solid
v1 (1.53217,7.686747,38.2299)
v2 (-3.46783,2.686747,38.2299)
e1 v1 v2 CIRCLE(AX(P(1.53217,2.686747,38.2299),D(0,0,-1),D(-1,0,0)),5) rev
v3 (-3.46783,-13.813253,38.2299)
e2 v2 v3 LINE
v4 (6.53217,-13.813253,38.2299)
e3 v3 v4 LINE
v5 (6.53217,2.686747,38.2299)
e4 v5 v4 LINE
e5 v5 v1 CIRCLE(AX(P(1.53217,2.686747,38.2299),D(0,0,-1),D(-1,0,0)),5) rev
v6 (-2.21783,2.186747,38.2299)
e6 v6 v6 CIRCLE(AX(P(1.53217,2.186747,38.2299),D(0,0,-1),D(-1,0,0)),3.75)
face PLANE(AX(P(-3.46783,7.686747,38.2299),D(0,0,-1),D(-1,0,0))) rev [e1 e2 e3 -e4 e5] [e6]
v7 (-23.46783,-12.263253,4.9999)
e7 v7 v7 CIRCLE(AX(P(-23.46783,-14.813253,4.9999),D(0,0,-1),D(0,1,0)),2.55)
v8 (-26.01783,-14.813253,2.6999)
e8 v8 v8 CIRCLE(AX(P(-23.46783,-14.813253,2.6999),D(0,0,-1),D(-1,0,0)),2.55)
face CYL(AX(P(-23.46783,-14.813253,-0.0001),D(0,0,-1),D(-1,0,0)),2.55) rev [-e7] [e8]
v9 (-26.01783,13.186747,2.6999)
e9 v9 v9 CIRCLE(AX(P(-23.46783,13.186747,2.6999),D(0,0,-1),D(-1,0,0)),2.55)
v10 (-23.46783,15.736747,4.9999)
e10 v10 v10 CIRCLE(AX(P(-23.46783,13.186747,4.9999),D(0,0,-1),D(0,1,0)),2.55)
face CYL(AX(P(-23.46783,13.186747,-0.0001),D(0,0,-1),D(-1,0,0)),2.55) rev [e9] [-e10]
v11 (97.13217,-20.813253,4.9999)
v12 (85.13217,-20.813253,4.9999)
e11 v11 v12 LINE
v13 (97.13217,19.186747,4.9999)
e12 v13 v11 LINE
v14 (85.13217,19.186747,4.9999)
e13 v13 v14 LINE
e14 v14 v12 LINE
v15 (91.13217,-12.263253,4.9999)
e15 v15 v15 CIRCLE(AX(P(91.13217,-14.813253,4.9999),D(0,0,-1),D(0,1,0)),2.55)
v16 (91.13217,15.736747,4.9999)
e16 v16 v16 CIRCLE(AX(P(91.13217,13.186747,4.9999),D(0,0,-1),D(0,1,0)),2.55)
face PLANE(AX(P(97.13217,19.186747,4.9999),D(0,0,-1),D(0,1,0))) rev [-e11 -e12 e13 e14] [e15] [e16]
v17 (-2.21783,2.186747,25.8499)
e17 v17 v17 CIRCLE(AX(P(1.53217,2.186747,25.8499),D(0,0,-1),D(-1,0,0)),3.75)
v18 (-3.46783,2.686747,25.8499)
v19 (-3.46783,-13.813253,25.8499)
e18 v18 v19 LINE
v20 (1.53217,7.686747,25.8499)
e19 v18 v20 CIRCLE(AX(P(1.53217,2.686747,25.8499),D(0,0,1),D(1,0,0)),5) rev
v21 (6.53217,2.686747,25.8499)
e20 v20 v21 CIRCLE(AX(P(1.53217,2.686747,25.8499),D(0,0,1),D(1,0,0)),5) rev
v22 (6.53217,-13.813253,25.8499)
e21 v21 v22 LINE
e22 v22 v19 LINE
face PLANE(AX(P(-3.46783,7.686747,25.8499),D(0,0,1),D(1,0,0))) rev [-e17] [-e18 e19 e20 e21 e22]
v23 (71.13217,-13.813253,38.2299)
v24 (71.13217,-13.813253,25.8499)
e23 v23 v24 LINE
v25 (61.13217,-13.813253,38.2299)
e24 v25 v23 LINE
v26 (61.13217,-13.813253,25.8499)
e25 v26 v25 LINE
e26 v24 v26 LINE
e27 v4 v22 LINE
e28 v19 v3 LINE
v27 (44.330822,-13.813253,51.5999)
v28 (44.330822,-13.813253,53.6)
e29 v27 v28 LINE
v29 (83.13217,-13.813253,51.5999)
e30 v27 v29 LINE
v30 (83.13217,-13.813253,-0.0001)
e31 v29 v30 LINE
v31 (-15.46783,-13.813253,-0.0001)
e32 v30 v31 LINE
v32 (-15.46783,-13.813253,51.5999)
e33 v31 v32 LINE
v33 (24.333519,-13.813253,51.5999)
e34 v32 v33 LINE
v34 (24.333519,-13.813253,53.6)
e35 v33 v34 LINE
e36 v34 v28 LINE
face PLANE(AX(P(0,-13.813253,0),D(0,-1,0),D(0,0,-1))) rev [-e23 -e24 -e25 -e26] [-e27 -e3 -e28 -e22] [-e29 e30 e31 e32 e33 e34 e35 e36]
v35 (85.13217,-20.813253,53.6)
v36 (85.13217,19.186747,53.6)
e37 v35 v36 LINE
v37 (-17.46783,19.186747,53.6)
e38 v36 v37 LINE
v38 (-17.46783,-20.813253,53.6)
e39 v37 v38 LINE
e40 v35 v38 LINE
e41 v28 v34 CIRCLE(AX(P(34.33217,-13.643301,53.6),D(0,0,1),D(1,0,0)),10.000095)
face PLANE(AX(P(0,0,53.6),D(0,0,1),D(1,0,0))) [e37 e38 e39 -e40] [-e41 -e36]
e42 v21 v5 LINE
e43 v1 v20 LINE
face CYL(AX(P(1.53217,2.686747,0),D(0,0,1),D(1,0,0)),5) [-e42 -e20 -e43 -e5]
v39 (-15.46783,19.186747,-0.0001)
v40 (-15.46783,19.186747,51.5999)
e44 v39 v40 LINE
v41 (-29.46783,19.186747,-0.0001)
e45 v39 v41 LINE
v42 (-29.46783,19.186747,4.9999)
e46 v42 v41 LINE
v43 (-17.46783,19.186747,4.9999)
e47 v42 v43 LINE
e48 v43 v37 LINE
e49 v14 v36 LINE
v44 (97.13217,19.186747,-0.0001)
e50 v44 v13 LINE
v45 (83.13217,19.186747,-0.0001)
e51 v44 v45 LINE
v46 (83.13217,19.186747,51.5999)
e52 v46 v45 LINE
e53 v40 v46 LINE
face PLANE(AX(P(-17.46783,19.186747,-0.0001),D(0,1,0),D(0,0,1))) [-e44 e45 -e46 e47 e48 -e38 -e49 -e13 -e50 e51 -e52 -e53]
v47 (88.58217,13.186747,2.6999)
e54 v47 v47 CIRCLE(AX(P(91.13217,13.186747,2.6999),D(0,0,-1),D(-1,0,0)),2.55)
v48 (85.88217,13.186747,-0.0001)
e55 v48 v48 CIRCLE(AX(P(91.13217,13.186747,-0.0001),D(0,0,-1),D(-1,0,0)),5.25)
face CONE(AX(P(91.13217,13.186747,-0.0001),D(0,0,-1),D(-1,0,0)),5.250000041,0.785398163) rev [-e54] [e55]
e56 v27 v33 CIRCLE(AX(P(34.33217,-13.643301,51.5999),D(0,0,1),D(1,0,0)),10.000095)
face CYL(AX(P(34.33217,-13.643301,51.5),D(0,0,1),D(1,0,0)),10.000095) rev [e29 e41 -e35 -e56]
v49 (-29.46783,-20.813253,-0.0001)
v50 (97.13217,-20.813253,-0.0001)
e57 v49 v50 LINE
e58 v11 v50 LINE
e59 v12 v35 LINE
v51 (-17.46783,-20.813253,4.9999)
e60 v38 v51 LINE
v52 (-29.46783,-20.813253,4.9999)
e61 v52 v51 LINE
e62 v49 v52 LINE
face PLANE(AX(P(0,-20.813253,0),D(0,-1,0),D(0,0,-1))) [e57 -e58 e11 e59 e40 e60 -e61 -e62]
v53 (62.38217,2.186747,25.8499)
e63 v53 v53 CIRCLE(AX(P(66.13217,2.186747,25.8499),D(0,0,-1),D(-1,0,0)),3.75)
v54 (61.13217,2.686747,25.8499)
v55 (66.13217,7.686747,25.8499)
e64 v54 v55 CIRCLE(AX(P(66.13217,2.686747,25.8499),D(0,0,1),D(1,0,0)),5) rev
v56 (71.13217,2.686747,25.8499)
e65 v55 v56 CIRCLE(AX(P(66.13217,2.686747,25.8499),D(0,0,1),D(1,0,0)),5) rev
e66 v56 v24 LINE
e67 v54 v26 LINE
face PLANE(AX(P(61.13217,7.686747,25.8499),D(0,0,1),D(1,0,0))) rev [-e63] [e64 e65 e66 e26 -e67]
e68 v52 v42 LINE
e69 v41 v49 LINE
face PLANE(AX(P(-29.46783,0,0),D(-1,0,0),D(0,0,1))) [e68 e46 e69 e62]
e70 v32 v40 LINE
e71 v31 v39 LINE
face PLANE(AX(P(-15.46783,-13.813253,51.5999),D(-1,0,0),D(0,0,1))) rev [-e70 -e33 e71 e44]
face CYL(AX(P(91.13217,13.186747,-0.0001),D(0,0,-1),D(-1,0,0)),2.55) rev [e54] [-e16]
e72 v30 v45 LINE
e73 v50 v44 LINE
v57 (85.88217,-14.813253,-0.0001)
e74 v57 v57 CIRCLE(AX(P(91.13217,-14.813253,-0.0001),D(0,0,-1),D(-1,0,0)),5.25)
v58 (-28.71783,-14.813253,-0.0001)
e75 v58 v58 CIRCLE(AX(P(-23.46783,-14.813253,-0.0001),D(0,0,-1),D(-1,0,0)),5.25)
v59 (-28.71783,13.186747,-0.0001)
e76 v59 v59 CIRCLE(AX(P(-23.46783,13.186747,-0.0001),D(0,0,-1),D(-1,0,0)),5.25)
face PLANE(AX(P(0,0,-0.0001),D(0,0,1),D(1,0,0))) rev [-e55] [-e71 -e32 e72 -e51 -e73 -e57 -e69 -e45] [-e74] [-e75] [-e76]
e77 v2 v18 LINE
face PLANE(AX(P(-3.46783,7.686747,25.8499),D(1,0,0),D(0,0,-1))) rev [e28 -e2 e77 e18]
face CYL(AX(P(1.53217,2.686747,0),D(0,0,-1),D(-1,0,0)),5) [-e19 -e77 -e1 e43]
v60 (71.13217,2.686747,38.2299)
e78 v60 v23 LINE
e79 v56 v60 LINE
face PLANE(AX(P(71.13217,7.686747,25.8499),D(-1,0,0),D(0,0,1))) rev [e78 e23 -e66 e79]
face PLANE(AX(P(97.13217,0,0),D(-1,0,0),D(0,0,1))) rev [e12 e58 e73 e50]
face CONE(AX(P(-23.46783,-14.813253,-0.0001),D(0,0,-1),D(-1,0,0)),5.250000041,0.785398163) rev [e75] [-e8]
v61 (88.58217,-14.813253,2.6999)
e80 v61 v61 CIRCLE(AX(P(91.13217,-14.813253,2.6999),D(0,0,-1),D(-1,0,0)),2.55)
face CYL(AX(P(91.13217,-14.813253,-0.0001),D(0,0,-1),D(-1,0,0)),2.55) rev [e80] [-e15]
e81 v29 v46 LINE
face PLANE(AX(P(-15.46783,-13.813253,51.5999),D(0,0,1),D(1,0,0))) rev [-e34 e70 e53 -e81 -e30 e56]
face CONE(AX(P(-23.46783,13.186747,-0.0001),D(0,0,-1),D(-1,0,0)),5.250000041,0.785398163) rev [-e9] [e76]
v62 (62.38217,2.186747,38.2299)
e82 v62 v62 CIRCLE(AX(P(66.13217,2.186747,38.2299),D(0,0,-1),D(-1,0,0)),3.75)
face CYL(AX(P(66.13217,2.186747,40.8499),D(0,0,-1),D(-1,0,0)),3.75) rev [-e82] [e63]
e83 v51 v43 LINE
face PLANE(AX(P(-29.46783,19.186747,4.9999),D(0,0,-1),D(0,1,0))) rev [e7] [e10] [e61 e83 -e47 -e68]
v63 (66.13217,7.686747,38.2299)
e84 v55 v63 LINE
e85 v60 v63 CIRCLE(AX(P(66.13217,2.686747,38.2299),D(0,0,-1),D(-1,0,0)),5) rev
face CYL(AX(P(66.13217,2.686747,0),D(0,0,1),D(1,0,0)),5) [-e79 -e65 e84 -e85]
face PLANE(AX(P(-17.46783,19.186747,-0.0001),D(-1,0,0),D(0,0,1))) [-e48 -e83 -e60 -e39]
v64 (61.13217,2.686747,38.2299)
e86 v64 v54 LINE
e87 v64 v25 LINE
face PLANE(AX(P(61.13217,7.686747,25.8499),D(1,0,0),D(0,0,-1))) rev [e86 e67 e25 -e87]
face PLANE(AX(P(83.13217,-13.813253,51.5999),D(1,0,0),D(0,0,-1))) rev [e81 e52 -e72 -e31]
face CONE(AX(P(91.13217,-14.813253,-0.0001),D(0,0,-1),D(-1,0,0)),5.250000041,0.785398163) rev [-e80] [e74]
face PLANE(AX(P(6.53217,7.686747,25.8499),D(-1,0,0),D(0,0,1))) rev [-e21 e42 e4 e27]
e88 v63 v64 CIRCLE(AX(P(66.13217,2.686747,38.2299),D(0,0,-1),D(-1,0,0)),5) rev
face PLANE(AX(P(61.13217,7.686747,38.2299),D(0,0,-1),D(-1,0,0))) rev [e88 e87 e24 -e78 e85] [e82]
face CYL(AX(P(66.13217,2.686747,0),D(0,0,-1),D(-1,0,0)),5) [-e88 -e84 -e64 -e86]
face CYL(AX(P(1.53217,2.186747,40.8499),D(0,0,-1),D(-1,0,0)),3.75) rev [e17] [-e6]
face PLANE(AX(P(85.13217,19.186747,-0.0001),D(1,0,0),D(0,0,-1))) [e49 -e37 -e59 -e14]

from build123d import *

# Parameters (mm, degrees)
BOSS_EXTRU_1_DEPTH                                = 53.6
BOSS_EXTRU_1_DEPTH_BACK                           = 0.0001
ESQUISSE1_W                                       = 102.6
ESQUISSE1_H                                       = 35
ESQUISSE4_W                                       = 98.6
ESQUISSE4_H                                       = 51.6
ENL_V_MAT_EXTRU_2_DEPTH                           = 33
ESQUISSE9_W                                       = 10
ESQUISSE9_H                                       = 12.38
BOSS_EXTRU_3_DEPTH                                = 21.5
CONG_1_R                                          = 5
ESQUISSE10_R                                      = 3.75
ENL_V_MAT_EXTRU_4_DEPTH                           = 15
ENL_V_MAT_EXTRU_5_DEPTH                           = 2.1
ESQUISSE19_W                                      = 102.6
ESQUISSE19_H                                      = 53.6001
BOSS_EXTRU_4_DEPTH                                = 5
ESQUISSE21_W                                      = 5
ESQUISSE21_H                                      = 40
BOSS_EXTRU_5_DEPTH                                = 12
ESQUISSE22_W                                      = 5
ESQUISSE22_H                                      = 40
BOSS_EXTRU_6_DEPTH                                = 12
FRAISAGE_POUR_VIS_T_TE_FRAIS_E_BOMB_E_D           = 5.09999996
FRAISAGE_POUR_VIS_T_TE_FRAIS_E_BOMB_E_CSINK_D     = 10.500000082
FRAISAGE_POUR_VIS_T_TE_FRAIS_E_BOMB_E_CSINK_ANGLE = 90


with BuildPart() as part:
    # Esquisse1 → Boss.-Extru.1 (new, two sides: drawn at the far end of the back side and taken through both)
    with BuildSketch(Plane.XY.offset(-BOSS_EXTRU_1_DEPTH_BACK)):
        with Locations((33.832170394, 1.686746988)):
            Rectangle(ESQUISSE1_W, ESQUISSE1_H)
    extrude(amount=BOSS_EXTRU_1_DEPTH + BOSS_EXTRU_1_DEPTH_BACK)

    # Esquisse4 → Enlèv. mat.-Extru.2 (cut)
    with BuildSketch(Plane(origin=(0, 19.186746988, 0), x_dir=(1, 0, 0), z_dir=(0, 1, 0))):
        with Locations((33.832170394, -25.7999)):
            Rectangle(ESQUISSE4_W, ESQUISSE4_H)
    extrude(amount=-ENL_V_MAT_EXTRU_2_DEPTH, mode=Mode.SUBTRACT)

    # Esquisse9 → Boss.-Extru.3 (add)
    with BuildSketch(Plane(origin=(0, -13.813253012, 0), x_dir=(1, 0, 0), z_dir=(0, 1, 0))):
        with Locations((1.532170394, -32.0399)):
            Rectangle(ESQUISSE9_W, ESQUISSE9_H)
        with Locations((66.132170394, -32.0399)):
            Rectangle(ESQUISSE9_W, ESQUISSE9_H)
    extrude(amount=BOSS_EXTRU_3_DEPTH)

    # Congé1
    cong_1_edges = [part.edges().sort_by_distance(p)[0] for p in [
        (-3.467829606, 7.686746988, 32.0399),
        (6.532170394, 7.686746988, 32.0399),
        (71.132170394, 7.686746988, 32.0399),
        (61.132170394, 7.686746988, 32.0399),
    ]]
    fillet(cong_1_edges, radius=CONG_1_R - 0.0001)  # a hair under: the kernel refuses the full size

    # Esquisse10 → Enlèv. mat.-Extru.4 (cut)
    with BuildSketch(Plane(origin=(0, 0, 25.8499), x_dir=(-1, 0, 0), z_dir=(0, 0, -1))):
        with Locations((-66.132170394, 2.186746988)):
            Circle(ESQUISSE10_R)
        with Locations((-1.532170394, 2.186746988)):
            Circle(ESQUISSE10_R)
    extrude(amount=-ENL_V_MAT_EXTRU_4_DEPTH, mode=Mode.SUBTRACT)

    # Esquisse18 → Enlèv. mat.-Extru.5 (cut)
    with BuildSketch(Plane.XY.offset(53.6)):
        with BuildLine():
            Line((24.333519225, -13.813253012), (44.330821563, -13.813253012))
            ThreePointArc((44.330821563, -13.813253012), (34.332170394, -3.643205178), (24.333519225, -13.813253012))
        make_face()
    extrude(amount=-ENL_V_MAT_EXTRU_5_DEPTH, mode=Mode.SUBTRACT)

    # Esquisse19 → Boss.-Extru.4 (add)
    with BuildSketch(Plane.XZ.offset(15.813253012)):
        with Locations((33.832170394, 26.79995)):
            Rectangle(ESQUISSE19_W, ESQUISSE19_H)
    extrude(amount=BOSS_EXTRU_4_DEPTH)

    # Esquisse21 → Boss.-Extru.5 (add)
    with BuildSketch(Plane.ZY.offset(17.467829606)):
        with Locations((2.4999, -0.813253012)):
            Rectangle(ESQUISSE21_W, ESQUISSE21_H)
    extrude(amount=BOSS_EXTRU_5_DEPTH)

    # Esquisse22 → Boss.-Extru.6 (add)
    with BuildSketch(Plane(origin=(85.132170394, 0, 0), x_dir=(0, 0, -1), z_dir=(1, 0, 0))):
        with Locations((-2.4999, -0.813253012)):
            Rectangle(ESQUISSE22_W, ESQUISSE22_H)
    extrude(amount=BOSS_EXTRU_6_DEPTH)

    # Fraisage pour vis à tête fraisée bombée #51 (through all)
    with Locations(Plane(origin=(91.132170394, 13.186746988, -0.0001), x_dir=(-1, 0, 0), z_dir=(0, 0, -1))):
        with Locations((0, 0), (0, -28), (114.6, 0), (114.6, -28)):
            CounterSinkHole(FRAISAGE_POUR_VIS_T_TE_FRAIS_E_BOMB_E_D / 2, FRAISAGE_POUR_VIS_T_TE_FRAIS_E_BOMB_E_CSINK_D / 2, counter_sink_angle=FRAISAGE_POUR_VIS_T_TE_FRAIS_E_BOMB_E_CSINK_ANGLE)


solid = part.part
